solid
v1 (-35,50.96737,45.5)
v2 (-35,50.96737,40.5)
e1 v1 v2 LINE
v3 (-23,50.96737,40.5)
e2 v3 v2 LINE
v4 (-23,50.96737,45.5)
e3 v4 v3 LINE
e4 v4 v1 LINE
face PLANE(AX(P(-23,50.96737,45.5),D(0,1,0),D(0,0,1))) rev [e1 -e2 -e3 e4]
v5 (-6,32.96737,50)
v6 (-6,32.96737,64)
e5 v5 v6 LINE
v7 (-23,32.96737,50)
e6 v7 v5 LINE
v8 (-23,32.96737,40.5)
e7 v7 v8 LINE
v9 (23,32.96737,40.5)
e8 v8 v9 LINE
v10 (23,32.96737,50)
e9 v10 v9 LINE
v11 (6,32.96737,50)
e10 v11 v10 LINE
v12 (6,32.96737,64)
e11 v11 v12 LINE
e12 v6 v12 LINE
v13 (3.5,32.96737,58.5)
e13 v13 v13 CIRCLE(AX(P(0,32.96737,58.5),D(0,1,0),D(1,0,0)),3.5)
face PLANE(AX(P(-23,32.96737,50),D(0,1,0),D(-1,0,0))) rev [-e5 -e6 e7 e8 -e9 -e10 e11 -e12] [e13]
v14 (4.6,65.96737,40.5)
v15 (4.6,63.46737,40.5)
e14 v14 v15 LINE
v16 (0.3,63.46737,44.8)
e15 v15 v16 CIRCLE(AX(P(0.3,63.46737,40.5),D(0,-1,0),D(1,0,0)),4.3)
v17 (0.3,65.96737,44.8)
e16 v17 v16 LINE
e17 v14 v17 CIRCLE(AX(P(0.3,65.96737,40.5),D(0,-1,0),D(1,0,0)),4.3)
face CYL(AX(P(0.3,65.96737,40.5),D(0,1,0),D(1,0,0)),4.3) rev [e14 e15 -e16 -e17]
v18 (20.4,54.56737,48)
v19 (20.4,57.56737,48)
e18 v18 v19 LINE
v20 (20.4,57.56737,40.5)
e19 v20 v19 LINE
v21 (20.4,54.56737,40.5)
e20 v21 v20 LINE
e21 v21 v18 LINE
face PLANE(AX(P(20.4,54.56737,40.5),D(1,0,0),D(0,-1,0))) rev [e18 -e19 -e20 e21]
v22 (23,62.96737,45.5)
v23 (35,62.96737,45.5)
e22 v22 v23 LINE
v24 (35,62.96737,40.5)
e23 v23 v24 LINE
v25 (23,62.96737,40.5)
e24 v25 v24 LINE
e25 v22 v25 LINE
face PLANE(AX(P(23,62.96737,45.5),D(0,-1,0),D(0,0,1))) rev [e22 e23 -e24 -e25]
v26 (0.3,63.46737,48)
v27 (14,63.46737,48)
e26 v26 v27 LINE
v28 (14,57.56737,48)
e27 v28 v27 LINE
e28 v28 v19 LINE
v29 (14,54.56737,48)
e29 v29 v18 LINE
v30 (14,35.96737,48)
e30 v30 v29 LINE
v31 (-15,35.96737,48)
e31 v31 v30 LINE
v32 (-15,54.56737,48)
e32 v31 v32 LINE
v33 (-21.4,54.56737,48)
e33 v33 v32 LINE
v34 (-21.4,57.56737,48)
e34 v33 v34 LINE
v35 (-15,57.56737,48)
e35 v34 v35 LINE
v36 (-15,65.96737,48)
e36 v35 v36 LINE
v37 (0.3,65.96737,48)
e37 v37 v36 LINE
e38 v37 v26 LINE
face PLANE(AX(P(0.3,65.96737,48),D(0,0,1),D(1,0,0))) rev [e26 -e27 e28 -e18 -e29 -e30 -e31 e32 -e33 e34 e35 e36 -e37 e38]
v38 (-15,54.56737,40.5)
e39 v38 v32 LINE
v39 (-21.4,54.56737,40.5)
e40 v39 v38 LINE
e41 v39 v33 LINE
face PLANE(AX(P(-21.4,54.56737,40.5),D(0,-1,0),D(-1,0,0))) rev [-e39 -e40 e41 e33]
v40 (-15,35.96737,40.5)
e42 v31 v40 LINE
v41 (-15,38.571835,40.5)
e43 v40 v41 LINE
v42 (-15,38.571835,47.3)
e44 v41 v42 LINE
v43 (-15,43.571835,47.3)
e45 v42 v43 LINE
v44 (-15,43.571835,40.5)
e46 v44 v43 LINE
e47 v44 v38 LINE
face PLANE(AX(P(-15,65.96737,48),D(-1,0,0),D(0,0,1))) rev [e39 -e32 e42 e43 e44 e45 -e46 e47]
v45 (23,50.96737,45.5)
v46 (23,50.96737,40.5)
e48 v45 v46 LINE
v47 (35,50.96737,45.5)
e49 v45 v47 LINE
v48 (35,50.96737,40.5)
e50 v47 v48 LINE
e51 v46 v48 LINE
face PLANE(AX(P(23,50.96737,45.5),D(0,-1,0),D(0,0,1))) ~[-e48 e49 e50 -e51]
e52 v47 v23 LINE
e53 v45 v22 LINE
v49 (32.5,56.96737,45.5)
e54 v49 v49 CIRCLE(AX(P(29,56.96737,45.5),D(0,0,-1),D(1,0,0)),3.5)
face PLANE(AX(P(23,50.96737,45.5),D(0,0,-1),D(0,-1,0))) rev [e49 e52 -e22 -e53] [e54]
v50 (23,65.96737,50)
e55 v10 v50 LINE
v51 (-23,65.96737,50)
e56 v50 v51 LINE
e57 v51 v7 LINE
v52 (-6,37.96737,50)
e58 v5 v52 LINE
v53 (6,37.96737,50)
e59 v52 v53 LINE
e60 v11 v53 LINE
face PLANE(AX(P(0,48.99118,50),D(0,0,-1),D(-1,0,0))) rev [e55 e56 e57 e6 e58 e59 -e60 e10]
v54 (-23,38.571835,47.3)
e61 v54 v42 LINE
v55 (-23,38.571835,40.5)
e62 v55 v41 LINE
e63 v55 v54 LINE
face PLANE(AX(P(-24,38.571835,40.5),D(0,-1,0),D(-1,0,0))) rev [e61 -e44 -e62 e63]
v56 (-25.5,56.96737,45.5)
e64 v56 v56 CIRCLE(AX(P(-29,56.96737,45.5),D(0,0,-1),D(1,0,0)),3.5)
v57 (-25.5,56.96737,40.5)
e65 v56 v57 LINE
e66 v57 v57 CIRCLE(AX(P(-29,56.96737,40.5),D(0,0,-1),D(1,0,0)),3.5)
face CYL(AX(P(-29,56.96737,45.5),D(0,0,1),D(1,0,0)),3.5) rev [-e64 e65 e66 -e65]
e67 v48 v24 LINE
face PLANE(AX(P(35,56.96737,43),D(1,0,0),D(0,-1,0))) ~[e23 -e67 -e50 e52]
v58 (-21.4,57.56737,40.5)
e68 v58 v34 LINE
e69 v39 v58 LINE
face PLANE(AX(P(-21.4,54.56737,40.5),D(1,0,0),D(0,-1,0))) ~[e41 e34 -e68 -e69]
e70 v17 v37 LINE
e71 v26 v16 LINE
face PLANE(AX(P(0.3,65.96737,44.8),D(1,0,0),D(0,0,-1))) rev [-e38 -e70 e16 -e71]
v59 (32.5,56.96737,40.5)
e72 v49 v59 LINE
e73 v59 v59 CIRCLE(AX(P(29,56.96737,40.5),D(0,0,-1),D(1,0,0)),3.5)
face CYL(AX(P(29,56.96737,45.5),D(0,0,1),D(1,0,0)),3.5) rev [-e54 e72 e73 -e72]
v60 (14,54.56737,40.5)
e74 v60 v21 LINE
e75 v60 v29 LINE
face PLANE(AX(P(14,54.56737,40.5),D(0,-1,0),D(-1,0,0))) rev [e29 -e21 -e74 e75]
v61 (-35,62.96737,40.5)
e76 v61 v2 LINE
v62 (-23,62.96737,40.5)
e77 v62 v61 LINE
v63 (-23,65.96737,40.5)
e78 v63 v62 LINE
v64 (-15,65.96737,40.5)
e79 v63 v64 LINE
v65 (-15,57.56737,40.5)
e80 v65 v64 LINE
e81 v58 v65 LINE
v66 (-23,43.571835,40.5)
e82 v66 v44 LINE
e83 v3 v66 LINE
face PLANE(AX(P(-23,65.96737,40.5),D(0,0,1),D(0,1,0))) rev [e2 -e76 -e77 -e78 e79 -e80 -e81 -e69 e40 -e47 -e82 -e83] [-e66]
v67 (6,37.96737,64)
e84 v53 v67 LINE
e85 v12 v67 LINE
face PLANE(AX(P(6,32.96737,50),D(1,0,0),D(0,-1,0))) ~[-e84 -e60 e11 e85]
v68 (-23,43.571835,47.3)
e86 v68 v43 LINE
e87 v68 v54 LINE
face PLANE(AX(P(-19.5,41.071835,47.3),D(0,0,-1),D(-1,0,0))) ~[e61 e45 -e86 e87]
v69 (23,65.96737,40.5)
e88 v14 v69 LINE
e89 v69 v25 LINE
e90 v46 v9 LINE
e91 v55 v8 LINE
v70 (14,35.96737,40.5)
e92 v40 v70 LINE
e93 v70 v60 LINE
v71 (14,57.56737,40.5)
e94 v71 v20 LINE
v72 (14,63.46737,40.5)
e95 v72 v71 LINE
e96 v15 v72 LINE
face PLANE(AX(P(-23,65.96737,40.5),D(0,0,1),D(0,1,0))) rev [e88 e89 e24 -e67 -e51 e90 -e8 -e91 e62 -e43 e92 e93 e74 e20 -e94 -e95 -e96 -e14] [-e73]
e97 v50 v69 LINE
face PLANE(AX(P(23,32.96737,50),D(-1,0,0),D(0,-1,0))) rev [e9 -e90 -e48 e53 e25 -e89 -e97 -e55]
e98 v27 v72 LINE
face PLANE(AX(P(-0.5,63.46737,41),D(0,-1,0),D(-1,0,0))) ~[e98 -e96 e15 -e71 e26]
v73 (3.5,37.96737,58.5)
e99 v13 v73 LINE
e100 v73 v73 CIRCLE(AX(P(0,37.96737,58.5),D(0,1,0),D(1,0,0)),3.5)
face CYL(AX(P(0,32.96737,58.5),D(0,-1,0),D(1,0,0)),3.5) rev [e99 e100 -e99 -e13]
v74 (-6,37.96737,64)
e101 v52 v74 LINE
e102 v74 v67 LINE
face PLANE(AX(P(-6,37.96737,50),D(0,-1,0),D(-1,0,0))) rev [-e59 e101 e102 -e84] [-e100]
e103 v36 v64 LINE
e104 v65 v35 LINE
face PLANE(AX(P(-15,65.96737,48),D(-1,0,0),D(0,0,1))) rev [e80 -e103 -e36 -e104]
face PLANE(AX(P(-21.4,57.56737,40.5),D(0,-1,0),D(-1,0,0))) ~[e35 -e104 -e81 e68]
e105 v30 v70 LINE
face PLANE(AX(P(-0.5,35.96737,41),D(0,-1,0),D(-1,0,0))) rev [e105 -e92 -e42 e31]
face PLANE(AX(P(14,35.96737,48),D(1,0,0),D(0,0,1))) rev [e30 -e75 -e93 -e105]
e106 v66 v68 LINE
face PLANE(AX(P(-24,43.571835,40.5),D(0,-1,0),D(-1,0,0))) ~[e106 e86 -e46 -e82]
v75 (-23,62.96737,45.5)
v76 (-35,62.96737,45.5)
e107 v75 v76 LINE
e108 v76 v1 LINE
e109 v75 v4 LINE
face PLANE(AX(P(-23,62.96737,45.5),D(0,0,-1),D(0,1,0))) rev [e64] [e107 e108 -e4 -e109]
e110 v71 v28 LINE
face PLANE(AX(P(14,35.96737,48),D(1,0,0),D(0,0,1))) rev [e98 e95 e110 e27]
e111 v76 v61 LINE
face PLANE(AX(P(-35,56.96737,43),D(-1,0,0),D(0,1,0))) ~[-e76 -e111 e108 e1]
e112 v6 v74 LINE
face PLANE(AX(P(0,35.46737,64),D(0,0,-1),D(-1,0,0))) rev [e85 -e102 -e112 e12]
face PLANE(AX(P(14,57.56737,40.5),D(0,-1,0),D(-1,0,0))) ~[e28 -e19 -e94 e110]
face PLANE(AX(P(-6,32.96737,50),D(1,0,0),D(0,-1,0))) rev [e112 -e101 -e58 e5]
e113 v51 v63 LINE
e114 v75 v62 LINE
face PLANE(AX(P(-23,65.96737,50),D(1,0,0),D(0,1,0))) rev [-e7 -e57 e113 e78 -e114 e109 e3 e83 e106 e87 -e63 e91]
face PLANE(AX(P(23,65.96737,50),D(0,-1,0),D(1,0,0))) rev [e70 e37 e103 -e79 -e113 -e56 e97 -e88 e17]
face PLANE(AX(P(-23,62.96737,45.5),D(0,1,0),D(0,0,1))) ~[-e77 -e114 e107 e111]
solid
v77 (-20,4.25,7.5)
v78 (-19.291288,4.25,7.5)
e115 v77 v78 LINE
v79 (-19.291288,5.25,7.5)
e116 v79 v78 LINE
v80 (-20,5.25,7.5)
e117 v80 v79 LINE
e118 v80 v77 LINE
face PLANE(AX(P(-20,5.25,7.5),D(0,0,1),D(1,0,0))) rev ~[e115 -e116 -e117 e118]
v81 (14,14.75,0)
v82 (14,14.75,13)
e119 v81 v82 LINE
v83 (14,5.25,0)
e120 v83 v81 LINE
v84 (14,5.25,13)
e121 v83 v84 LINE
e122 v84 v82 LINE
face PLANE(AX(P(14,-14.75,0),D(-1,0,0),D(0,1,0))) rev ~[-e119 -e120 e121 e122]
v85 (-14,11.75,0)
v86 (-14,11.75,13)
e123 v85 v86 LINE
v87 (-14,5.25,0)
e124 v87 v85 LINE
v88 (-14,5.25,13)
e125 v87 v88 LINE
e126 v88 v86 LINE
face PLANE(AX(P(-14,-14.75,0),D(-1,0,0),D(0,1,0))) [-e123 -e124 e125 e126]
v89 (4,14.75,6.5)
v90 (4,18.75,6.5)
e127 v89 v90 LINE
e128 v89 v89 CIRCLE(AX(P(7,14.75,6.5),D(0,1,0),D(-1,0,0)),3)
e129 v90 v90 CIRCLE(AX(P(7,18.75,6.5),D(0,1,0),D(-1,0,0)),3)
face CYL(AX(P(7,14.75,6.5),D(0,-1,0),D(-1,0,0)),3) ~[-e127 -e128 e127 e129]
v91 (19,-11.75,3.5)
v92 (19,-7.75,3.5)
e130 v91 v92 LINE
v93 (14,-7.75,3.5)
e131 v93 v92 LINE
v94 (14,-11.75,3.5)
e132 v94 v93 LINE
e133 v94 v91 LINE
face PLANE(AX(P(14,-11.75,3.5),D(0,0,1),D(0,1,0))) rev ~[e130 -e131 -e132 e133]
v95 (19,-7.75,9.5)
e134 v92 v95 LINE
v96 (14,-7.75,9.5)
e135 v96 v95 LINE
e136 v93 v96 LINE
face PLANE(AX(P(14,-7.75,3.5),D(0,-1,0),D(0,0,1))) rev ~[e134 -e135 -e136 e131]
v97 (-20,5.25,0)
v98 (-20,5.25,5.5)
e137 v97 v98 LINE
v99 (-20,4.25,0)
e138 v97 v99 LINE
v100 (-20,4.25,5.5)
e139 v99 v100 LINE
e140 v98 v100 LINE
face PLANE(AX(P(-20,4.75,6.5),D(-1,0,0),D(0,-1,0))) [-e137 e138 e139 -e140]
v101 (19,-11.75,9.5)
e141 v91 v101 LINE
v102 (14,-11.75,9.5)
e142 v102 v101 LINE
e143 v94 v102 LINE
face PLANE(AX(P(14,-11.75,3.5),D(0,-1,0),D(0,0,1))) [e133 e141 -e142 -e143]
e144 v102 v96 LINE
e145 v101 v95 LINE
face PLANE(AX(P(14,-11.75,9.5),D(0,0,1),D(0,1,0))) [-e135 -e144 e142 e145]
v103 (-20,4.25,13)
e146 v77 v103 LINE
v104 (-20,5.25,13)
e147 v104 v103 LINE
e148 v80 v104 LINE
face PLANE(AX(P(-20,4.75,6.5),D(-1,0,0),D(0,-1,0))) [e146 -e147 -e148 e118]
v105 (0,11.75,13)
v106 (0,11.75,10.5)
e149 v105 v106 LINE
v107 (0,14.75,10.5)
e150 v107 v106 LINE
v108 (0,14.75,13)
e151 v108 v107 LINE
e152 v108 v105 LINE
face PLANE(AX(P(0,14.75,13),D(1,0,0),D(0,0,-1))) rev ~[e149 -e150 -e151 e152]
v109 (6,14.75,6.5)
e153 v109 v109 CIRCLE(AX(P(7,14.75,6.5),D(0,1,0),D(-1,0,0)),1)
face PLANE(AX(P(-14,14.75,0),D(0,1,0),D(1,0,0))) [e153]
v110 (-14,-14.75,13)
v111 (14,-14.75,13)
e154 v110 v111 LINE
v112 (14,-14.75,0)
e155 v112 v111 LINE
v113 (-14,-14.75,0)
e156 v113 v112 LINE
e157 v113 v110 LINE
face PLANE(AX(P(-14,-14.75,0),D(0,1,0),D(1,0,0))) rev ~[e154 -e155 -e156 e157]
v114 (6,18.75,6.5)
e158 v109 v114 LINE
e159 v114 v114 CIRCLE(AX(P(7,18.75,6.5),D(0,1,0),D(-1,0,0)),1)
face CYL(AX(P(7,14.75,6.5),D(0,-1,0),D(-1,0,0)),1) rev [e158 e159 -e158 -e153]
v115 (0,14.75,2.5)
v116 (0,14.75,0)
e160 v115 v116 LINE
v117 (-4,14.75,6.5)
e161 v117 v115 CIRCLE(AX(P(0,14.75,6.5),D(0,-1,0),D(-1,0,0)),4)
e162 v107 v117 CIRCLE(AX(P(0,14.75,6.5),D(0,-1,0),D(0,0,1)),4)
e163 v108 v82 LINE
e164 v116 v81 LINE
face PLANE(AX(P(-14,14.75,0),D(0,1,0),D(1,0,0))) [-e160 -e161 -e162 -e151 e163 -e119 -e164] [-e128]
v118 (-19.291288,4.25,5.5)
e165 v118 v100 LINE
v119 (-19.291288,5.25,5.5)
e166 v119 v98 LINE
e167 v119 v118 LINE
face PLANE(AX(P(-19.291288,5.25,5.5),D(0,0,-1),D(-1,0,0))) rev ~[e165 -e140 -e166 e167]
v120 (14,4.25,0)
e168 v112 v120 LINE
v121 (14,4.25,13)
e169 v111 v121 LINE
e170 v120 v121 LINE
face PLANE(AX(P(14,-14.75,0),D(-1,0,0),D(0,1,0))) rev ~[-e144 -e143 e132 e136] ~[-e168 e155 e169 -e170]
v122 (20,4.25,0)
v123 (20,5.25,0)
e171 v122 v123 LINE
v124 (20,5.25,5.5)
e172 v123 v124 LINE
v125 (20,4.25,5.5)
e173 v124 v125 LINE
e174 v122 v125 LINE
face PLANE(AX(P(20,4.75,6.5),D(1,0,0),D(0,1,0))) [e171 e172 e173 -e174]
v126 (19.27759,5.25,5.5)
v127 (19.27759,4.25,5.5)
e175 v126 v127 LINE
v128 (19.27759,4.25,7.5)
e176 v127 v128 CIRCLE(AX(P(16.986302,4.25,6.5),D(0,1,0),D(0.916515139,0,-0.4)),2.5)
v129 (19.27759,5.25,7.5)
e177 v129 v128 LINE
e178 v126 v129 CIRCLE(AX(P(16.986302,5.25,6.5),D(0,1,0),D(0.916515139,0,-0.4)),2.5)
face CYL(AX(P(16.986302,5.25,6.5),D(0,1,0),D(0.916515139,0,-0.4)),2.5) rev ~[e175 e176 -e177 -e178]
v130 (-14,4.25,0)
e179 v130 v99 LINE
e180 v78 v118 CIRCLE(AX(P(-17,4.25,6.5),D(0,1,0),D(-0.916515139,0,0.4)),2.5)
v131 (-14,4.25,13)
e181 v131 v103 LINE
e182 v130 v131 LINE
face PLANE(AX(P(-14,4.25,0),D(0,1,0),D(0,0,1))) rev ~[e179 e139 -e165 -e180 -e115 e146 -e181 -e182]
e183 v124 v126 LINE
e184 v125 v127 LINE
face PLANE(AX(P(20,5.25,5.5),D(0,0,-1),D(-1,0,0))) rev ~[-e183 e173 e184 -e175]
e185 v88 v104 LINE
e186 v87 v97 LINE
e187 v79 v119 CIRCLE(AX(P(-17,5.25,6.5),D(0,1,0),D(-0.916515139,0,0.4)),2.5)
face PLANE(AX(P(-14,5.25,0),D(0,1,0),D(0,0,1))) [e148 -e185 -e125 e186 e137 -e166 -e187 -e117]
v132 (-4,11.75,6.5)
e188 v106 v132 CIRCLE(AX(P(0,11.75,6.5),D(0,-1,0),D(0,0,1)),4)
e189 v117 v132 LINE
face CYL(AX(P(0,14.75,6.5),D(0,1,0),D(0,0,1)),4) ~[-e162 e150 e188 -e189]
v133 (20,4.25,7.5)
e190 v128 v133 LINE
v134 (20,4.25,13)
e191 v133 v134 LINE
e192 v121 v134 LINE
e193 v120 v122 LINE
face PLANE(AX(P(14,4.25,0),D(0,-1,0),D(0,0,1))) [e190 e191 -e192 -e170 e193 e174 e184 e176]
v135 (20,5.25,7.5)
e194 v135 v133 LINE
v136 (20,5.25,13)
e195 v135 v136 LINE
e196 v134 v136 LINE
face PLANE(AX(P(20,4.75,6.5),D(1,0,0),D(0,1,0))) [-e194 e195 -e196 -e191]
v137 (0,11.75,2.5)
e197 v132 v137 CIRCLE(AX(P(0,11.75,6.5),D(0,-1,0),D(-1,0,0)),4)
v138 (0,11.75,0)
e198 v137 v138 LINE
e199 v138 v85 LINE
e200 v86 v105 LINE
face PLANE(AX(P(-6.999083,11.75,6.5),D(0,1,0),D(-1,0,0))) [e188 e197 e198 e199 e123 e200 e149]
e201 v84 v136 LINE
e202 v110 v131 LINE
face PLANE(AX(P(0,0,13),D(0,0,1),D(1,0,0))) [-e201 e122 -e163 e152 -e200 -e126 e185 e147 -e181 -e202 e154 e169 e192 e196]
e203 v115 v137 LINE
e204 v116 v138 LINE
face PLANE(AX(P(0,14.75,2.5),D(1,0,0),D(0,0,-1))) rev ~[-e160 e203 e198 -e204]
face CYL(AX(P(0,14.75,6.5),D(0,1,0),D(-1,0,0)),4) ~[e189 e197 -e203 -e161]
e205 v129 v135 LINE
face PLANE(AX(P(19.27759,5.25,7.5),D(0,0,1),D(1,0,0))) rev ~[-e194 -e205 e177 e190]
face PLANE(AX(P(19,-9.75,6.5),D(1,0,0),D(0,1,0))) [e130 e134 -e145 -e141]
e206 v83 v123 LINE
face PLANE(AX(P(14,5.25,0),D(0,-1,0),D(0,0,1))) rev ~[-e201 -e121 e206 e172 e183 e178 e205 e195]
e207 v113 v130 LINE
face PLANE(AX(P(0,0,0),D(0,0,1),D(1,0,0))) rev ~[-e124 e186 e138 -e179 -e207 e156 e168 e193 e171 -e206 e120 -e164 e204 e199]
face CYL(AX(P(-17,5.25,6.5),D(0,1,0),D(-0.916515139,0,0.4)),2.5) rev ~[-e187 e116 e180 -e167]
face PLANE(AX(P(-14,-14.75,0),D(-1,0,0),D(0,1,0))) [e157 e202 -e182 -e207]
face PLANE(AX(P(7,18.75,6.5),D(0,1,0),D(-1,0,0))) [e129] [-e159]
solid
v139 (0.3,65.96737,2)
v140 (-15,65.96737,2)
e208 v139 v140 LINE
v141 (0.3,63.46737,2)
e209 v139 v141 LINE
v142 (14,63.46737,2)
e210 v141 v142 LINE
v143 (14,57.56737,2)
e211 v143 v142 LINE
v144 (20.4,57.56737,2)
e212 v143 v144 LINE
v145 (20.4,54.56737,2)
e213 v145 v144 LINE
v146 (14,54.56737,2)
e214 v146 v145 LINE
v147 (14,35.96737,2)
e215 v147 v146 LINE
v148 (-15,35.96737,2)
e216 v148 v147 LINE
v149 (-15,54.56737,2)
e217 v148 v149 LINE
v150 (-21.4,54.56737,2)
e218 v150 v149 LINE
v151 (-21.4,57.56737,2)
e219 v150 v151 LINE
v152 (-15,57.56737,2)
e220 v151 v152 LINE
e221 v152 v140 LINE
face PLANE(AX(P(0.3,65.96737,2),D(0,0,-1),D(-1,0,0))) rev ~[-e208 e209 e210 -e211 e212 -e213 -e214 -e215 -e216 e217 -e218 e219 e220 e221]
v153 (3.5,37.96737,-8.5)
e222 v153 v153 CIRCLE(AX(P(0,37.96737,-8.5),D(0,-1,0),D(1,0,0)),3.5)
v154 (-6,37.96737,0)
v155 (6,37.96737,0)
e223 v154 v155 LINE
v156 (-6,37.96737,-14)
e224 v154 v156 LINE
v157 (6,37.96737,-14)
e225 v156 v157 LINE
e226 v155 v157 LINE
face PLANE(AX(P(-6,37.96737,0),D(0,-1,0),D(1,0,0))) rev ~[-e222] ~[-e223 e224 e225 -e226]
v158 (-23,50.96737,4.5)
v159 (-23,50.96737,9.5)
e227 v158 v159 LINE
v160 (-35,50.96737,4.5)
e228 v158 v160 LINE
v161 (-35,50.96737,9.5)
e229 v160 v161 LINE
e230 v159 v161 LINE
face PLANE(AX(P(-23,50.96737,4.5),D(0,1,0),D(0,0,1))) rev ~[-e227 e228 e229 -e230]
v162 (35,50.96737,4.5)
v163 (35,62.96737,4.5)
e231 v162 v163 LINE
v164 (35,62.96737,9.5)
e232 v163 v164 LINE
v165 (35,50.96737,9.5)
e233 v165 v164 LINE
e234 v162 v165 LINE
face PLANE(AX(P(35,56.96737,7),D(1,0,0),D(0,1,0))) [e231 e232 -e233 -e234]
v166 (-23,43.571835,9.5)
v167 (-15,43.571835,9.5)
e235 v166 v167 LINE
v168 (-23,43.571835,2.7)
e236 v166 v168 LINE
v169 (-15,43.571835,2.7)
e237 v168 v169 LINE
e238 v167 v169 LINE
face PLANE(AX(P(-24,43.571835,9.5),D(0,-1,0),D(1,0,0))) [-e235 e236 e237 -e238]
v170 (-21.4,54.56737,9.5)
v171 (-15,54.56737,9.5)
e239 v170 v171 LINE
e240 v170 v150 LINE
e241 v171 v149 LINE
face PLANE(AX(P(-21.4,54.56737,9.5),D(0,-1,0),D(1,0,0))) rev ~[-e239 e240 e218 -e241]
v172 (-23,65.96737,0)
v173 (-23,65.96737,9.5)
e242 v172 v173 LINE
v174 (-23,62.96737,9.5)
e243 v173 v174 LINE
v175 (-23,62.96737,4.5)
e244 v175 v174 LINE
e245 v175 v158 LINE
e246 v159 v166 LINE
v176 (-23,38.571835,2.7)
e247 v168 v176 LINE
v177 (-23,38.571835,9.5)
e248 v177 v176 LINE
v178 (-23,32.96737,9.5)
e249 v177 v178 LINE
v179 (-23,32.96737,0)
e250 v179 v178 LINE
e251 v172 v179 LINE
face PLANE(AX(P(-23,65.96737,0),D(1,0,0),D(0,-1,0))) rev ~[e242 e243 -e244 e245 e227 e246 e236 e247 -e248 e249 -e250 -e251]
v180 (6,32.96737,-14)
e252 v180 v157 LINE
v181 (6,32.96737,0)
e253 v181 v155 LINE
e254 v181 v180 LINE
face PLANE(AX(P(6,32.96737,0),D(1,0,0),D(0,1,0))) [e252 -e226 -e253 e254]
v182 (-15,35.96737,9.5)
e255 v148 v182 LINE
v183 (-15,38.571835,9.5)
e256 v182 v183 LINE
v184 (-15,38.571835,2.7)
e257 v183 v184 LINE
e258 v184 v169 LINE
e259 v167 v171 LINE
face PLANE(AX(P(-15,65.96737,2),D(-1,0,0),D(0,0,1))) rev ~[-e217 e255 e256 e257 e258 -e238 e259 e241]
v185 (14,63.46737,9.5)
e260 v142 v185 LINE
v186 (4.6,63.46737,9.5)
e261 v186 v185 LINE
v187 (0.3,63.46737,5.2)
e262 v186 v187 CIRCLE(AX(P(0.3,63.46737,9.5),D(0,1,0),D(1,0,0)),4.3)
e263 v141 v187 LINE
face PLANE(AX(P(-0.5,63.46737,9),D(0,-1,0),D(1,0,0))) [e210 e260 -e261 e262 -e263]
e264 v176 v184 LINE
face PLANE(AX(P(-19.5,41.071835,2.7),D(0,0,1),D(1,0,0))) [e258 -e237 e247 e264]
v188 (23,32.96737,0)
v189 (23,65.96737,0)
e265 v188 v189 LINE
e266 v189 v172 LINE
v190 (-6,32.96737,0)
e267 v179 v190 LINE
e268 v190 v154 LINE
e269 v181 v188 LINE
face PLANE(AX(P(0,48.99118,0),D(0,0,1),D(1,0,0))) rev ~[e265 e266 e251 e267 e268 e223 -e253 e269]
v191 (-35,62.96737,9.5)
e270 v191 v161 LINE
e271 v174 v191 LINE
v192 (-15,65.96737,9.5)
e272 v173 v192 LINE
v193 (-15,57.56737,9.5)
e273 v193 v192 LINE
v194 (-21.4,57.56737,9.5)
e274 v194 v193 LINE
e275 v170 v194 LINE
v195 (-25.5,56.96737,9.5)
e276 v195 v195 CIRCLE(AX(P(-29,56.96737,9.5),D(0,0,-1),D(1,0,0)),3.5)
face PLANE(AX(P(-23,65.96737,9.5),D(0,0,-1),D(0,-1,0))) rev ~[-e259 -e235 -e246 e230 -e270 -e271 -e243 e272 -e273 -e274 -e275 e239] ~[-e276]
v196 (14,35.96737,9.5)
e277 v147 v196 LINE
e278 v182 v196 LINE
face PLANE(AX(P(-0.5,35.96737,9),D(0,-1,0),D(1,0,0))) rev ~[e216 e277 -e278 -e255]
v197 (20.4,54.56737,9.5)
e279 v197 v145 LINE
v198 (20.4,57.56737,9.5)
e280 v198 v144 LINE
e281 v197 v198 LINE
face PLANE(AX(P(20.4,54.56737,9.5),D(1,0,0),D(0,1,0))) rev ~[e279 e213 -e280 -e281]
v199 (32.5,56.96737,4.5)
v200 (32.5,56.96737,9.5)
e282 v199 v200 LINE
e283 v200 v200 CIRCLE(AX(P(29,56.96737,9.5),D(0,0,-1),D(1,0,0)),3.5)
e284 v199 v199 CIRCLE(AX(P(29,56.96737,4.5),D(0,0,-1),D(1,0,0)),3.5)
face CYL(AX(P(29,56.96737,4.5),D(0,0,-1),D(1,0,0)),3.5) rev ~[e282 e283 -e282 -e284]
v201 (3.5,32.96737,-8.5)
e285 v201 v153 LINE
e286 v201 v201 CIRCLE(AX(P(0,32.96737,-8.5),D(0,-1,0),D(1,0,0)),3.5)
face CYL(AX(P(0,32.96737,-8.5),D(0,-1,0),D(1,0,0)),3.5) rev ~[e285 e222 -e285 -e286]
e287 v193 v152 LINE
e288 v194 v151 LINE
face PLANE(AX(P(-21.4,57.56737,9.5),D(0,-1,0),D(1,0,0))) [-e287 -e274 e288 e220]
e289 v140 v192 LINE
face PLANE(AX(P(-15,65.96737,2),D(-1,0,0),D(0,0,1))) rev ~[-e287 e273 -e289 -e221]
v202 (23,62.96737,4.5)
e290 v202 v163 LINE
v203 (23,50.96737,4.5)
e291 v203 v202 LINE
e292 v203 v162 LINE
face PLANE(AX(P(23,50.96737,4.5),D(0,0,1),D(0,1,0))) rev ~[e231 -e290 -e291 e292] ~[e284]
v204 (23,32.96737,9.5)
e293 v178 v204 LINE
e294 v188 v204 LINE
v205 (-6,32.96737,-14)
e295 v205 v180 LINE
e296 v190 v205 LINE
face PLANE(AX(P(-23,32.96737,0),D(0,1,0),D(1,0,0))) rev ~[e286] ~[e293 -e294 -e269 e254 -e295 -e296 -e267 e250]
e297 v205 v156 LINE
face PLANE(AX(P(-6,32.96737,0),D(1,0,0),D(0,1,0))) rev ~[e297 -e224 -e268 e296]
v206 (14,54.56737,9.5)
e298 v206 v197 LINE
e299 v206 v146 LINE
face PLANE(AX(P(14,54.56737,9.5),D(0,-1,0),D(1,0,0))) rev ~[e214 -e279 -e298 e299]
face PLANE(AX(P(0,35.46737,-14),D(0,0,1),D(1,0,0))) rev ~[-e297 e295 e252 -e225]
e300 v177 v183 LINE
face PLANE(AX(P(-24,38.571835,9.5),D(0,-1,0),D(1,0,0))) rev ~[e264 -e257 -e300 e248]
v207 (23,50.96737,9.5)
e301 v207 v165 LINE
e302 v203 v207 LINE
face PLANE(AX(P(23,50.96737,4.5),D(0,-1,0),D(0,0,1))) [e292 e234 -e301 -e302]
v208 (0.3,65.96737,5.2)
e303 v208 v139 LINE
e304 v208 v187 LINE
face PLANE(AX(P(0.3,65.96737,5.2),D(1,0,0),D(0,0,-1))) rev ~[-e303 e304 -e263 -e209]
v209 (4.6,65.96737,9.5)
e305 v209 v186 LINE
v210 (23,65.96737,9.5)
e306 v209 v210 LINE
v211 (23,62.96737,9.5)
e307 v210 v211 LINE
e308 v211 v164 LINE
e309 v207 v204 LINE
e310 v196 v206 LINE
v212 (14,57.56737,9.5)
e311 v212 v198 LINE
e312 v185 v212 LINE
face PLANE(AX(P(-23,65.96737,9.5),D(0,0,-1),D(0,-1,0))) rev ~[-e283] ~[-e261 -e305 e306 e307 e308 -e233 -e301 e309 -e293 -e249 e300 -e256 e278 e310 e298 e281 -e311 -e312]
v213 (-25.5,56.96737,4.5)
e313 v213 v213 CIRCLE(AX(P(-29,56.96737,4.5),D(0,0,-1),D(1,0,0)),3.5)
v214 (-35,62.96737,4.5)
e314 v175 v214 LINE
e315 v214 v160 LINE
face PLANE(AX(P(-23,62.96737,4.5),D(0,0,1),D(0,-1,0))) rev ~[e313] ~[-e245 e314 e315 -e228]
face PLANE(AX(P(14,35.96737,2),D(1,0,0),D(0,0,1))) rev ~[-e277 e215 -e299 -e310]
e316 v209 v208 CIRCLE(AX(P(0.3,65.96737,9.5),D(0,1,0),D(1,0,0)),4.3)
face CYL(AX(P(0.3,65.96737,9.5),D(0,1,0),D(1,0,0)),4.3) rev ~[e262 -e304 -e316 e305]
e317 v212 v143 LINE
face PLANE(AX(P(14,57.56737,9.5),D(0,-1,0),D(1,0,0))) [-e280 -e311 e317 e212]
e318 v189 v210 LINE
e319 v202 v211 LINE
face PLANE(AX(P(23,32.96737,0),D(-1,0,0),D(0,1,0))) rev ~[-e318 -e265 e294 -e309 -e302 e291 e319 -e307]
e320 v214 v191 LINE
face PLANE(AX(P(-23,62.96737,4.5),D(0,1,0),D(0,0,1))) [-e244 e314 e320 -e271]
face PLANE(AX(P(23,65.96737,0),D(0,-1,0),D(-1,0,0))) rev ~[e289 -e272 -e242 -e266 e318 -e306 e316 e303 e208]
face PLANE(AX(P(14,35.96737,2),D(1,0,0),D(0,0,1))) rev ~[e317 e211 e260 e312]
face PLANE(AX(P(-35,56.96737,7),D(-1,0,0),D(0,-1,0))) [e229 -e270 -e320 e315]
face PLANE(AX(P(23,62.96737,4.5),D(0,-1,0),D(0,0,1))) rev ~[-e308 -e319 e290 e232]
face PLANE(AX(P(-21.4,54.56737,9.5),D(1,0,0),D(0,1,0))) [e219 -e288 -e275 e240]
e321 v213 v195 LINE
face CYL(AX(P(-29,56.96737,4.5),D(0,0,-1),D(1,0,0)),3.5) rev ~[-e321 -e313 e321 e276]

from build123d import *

# Parameters (mm, degrees)
F0_W      = 28
F0_H      = 29.5
F1_DEPTH  = 13
F3_DEPTH  = 3
F4_R      = 3
F4_R_2    = 1
F5_DEPTH  = 4
F6_W      = 1
F6_H      = 13
F7_DEPTH  = 6
F8_W      = 1
F8_H      = 13
F9_DEPTH  = 6
F11_DEPTH = 1
F13_DEPTH = 1
F14_W     = 4
F14_H     = 6
F15_DEPTH = 5
F16_W     = 12
F16_H     = 5
F17_DEPTH = 19
F19_W     = 29
F19_H     = 14
F20_DEPTH = 26.5
F21_W     = 33
F21_H     = 9.5
F22_DEPTH = 46
F24_DEPTH = 4
F25_W     = 6.4
F25_H     = 3
F26_DEPTH = 7.5
F27_W     = 9
F27_H     = 5
F28_DEPTH = 6.8
F31_W     = 12
F31_H     = 5
F32_DEPTH = 12
F33_W     = 12
F33_H     = 5
F34_DEPTH = 12
F35_R     = 3.5
F36_DEPTH = 5
F37_R     = 3.5
F38_DEPTH = 5
F39_DEPTH = 1
F40_DEPTH = 14
F41_R     = 3.5
F42_DEPTH = 5


# Not quite as in the source:
# - a feature names something its author has since deleted; it is built from what else it names


with BuildPart() as f1:
    # F0 (on Top) → F1 (new body)
    with BuildSketch(Plane.XY):
        Rectangle(F0_W, F0_H)
    extrude(amount=F1_DEPTH)

    # F2 (on face) → F3 (cut)
    with BuildSketch(Plane(origin=(0, 14.75, 0), x_dir=(-1, 0, 0), z_dir=(0, 1, 0))):
        with BuildLine():
            ThreePointArc((0, 10.5), (2.8284271247, 9.3284271247), (4, 6.5))
            ThreePointArc((4, 6.5), (2.8284271247, 3.6715728753), (0, 2.5))
            Line((0, 2.5), (0, 0))
            Line((0, 0), (14, 0))
            Line((14, 0), (14, 13))
            Line((14, 13), (0, 13))
            Line((0, 13), (0, 10.5))
        make_face()
    extrude(amount=-F3_DEPTH, mode=Mode.SUBTRACT)

    # F4 (on face) → F5 (join)
    with BuildSketch(Plane(origin=(0, 14.75, 0), x_dir=(-1, 0, 0), z_dir=(0, 1, 0))):
        with Locations((-7, 6.5)):
            Circle(F4_R)
        with Locations((-7, 6.5)):
            Circle(F4_R_2, mode=Mode.SUBTRACT)
    extrude(amount=F5_DEPTH)

    # F6 (on face) → F7 (join)
    with BuildSketch(Plane(origin=(-14, 0, 0), x_dir=(0, -1, 0), z_dir=(-1, 0, 0))):
        with Locations((-4.75, 6.5)):
            Rectangle(F6_W, F6_H)
    extrude(amount=F7_DEPTH)

    # F8 (on face) → F9 (join)
    with BuildSketch(Plane.YZ.offset(14)):
        with Locations((4.75, 6.5)):
            Rectangle(F8_W, F8_H)
    extrude(amount=F9_DEPTH)

    # F10 (on face) → F11 (cut)
    with BuildSketch(Plane(origin=(0, 5.25, 0), x_dir=(-1, 0, 0), z_dir=(0, 1, 0))):
        with BuildLine():
            Line((-20, 5.5), (-19.2775895342, 5.5))
            ThreePointArc((-19.2775895342, 5.5), (-14.4863016867, 6.5), (-19.2775895342, 7.5))
            Line((-19.2775895342, 7.5), (-20, 7.5))
            Line((-20, 7.5), (-20, 5.5))
        make_face()
    extrude(amount=-F11_DEPTH, mode=Mode.SUBTRACT)

    # F12 (on face) → F13 (cut)
    with BuildSketch(Plane(origin=(0, 5.25, 0), x_dir=(-1, 0, 0), z_dir=(0, 1, 0))):
        with BuildLine():
            Line((20, 7.5), (19.2912878475, 7.5))
            ThreePointArc((19.2912878475, 7.5), (14.5, 6.5), (19.2912878475, 5.5))
            Line((19.2912878475, 5.5), (20, 5.5))
            Line((20, 5.5), (20, 7.5))
        make_face()
    extrude(amount=-F13_DEPTH, mode=Mode.SUBTRACT)

    # F14 (on face) → F15 (join)
    with BuildSketch(Plane.YZ.offset(14)):
        with Locations((-9.75, 6.5)):
            Rectangle(F14_W, F14_H)
    extrude(amount=F15_DEPTH)


with BuildPart() as f17:
    # F16 (on Top) → F17 (new body)
    with BuildSketch(Plane.XY):
        Polygon((23, 65.9673700035), (-23, 65.9673700035), (-23, 32.9673700035), (-6, 32.9673700035), (-6, 37.9673700035), (6, 37.9673700035), (6, 32.9673700035), (23, 32.9673700035), align=None)
        with Locations((0, 35.4673700035)):
            Rectangle(F16_W, F16_H)
    extrude(amount=F17_DEPTH)

    # F19 (on offset) → F20 (cut)
    with BuildSketch(Plane.XZ.offset(-35.9673700035)):
        with Locations((-0.5, 9)):
            Rectangle(F19_W, F19_H)
    extrude(amount=-F20_DEPTH, mode=Mode.SUBTRACT)

    # F21 (on face) → F22 (cut)
    with BuildSketch(Plane(origin=(-23, 0, 0), x_dir=(0, -1, 0), z_dir=(-1, 0, 0))):
        with Locations((-49.4673700035, 14.25)):
            Rectangle(F21_W, F21_H)
    extrude(amount=-F22_DEPTH, mode=Mode.SUBTRACT)

    # F23 (on face) → F24 (cut)
    with BuildSketch(Plane(origin=(0, 65.9673700035, 0), x_dir=(-1, 0, 0), z_dir=(0, 1, 0))):
        with BuildLine():
            Line((4, 9.5), (-4.6, 9.5))
            ThreePointArc((-4.6, 9.5), (-3.3405591591, 6.4594408409), (-0.3, 5.2))
            Line((-0.3, 5.2), (-0.3, 2))
            Line((-0.3, 2), (15, 2))
            Line((15, 2), (15, 9.5))
            Line((15, 9.5), (4, 9.5))
        make_face()
    extrude(amount=-F24_DEPTH, mode=Mode.SUBTRACT)

    # F25 (on face) → F26 (cut)
    with BuildSketch(Plane.XY.offset(9.5)):
        with Locations((-18.2, 56.0673700035)):
            Rectangle(F25_W, F25_H)
        with Locations((17.2, 56.0673700035)):
            Rectangle(F25_W, F25_H)
    extrude(amount=-F26_DEPTH, mode=Mode.SUBTRACT)

    # F27 (on face) → F28 (cut)
    with BuildSketch(Plane.XY.offset(9.5)):
        with Locations((-19.5, 41.0718345642)):
            Rectangle(F27_W, F27_H)
    extrude(amount=-F28_DEPTH, mode=Mode.SUBTRACT)


with BuildPart() as f30_1:
    # F30: copy of F17
    add(f17.part)


with BuildPart() as f17_1:
    add(f17.part)

    add(f30_1.part)  # F32 merges F30_1
    # F31 (on face) → F32 (join)
    with BuildSketch(Plane.YZ.offset(23)):
        with Locations((56.9673700035, 7)):
            Rectangle(F31_W, F31_H)
    extrude(amount=F32_DEPTH)

    # F33 (on face) → F34 (join)
    with BuildSketch(Plane(origin=(-23, 0, 0), x_dir=(0, -1, 0), z_dir=(-1, 0, 0))):
        with Locations((-56.9673700035, 7)):
            Rectangle(F33_W, F33_H)
    extrude(amount=F34_DEPTH)

    # F35 (on face) → F36 (cut)
    with BuildSketch(Plane(origin=(0, 0, 4.5), x_dir=(1, 0, 0), z_dir=(0, 0, -1))):
        with Locations((-29, -56.9673700035)):
            Circle(F35_R)
    extrude(amount=-F36_DEPTH, mode=Mode.SUBTRACT)

    # F37 (on face) → F38 (cut)
    with BuildSketch(Plane(origin=(0, 0, 4.5), x_dir=(1, 0, 0), z_dir=(0, 0, -1))):
        with Locations((29, -56.9673700035)):
            Circle(F37_R)
    extrude(amount=-F38_DEPTH, mode=Mode.SUBTRACT)

    # F39 (cut): a face of the model
    f39_faces = [f17_1.faces().sort_by_distance(p)[0] for p in [
        (7.9771009102, 62.4673700035, 5.4331480297),
    ]]
    extrude(f39_faces, amount=-F39_DEPTH, mode=Mode.SUBTRACT)

    # F16 (on Top) → F40 (join)
    with BuildSketch(Plane.XY):
        with Locations((0, 35.4673700035)):
            Rectangle(F16_W, F16_H)
    extrude(amount=-F40_DEPTH)

    # F41 (on face) → F42 (cut)
    with BuildSketch(Plane.XZ.offset(-32.9673700035)):
        with Locations((0, -8.5)):
            Circle(F41_R)
    extrude(amount=-F42_DEPTH, mode=Mode.SUBTRACT)


with BuildPart() as f43_1:
    # F43: instance of F17
    add(f17_1.part.mirror(Plane.XY.offset(25)))


solid = Compound([f1.part, f17_1.part, f43_1.part])
